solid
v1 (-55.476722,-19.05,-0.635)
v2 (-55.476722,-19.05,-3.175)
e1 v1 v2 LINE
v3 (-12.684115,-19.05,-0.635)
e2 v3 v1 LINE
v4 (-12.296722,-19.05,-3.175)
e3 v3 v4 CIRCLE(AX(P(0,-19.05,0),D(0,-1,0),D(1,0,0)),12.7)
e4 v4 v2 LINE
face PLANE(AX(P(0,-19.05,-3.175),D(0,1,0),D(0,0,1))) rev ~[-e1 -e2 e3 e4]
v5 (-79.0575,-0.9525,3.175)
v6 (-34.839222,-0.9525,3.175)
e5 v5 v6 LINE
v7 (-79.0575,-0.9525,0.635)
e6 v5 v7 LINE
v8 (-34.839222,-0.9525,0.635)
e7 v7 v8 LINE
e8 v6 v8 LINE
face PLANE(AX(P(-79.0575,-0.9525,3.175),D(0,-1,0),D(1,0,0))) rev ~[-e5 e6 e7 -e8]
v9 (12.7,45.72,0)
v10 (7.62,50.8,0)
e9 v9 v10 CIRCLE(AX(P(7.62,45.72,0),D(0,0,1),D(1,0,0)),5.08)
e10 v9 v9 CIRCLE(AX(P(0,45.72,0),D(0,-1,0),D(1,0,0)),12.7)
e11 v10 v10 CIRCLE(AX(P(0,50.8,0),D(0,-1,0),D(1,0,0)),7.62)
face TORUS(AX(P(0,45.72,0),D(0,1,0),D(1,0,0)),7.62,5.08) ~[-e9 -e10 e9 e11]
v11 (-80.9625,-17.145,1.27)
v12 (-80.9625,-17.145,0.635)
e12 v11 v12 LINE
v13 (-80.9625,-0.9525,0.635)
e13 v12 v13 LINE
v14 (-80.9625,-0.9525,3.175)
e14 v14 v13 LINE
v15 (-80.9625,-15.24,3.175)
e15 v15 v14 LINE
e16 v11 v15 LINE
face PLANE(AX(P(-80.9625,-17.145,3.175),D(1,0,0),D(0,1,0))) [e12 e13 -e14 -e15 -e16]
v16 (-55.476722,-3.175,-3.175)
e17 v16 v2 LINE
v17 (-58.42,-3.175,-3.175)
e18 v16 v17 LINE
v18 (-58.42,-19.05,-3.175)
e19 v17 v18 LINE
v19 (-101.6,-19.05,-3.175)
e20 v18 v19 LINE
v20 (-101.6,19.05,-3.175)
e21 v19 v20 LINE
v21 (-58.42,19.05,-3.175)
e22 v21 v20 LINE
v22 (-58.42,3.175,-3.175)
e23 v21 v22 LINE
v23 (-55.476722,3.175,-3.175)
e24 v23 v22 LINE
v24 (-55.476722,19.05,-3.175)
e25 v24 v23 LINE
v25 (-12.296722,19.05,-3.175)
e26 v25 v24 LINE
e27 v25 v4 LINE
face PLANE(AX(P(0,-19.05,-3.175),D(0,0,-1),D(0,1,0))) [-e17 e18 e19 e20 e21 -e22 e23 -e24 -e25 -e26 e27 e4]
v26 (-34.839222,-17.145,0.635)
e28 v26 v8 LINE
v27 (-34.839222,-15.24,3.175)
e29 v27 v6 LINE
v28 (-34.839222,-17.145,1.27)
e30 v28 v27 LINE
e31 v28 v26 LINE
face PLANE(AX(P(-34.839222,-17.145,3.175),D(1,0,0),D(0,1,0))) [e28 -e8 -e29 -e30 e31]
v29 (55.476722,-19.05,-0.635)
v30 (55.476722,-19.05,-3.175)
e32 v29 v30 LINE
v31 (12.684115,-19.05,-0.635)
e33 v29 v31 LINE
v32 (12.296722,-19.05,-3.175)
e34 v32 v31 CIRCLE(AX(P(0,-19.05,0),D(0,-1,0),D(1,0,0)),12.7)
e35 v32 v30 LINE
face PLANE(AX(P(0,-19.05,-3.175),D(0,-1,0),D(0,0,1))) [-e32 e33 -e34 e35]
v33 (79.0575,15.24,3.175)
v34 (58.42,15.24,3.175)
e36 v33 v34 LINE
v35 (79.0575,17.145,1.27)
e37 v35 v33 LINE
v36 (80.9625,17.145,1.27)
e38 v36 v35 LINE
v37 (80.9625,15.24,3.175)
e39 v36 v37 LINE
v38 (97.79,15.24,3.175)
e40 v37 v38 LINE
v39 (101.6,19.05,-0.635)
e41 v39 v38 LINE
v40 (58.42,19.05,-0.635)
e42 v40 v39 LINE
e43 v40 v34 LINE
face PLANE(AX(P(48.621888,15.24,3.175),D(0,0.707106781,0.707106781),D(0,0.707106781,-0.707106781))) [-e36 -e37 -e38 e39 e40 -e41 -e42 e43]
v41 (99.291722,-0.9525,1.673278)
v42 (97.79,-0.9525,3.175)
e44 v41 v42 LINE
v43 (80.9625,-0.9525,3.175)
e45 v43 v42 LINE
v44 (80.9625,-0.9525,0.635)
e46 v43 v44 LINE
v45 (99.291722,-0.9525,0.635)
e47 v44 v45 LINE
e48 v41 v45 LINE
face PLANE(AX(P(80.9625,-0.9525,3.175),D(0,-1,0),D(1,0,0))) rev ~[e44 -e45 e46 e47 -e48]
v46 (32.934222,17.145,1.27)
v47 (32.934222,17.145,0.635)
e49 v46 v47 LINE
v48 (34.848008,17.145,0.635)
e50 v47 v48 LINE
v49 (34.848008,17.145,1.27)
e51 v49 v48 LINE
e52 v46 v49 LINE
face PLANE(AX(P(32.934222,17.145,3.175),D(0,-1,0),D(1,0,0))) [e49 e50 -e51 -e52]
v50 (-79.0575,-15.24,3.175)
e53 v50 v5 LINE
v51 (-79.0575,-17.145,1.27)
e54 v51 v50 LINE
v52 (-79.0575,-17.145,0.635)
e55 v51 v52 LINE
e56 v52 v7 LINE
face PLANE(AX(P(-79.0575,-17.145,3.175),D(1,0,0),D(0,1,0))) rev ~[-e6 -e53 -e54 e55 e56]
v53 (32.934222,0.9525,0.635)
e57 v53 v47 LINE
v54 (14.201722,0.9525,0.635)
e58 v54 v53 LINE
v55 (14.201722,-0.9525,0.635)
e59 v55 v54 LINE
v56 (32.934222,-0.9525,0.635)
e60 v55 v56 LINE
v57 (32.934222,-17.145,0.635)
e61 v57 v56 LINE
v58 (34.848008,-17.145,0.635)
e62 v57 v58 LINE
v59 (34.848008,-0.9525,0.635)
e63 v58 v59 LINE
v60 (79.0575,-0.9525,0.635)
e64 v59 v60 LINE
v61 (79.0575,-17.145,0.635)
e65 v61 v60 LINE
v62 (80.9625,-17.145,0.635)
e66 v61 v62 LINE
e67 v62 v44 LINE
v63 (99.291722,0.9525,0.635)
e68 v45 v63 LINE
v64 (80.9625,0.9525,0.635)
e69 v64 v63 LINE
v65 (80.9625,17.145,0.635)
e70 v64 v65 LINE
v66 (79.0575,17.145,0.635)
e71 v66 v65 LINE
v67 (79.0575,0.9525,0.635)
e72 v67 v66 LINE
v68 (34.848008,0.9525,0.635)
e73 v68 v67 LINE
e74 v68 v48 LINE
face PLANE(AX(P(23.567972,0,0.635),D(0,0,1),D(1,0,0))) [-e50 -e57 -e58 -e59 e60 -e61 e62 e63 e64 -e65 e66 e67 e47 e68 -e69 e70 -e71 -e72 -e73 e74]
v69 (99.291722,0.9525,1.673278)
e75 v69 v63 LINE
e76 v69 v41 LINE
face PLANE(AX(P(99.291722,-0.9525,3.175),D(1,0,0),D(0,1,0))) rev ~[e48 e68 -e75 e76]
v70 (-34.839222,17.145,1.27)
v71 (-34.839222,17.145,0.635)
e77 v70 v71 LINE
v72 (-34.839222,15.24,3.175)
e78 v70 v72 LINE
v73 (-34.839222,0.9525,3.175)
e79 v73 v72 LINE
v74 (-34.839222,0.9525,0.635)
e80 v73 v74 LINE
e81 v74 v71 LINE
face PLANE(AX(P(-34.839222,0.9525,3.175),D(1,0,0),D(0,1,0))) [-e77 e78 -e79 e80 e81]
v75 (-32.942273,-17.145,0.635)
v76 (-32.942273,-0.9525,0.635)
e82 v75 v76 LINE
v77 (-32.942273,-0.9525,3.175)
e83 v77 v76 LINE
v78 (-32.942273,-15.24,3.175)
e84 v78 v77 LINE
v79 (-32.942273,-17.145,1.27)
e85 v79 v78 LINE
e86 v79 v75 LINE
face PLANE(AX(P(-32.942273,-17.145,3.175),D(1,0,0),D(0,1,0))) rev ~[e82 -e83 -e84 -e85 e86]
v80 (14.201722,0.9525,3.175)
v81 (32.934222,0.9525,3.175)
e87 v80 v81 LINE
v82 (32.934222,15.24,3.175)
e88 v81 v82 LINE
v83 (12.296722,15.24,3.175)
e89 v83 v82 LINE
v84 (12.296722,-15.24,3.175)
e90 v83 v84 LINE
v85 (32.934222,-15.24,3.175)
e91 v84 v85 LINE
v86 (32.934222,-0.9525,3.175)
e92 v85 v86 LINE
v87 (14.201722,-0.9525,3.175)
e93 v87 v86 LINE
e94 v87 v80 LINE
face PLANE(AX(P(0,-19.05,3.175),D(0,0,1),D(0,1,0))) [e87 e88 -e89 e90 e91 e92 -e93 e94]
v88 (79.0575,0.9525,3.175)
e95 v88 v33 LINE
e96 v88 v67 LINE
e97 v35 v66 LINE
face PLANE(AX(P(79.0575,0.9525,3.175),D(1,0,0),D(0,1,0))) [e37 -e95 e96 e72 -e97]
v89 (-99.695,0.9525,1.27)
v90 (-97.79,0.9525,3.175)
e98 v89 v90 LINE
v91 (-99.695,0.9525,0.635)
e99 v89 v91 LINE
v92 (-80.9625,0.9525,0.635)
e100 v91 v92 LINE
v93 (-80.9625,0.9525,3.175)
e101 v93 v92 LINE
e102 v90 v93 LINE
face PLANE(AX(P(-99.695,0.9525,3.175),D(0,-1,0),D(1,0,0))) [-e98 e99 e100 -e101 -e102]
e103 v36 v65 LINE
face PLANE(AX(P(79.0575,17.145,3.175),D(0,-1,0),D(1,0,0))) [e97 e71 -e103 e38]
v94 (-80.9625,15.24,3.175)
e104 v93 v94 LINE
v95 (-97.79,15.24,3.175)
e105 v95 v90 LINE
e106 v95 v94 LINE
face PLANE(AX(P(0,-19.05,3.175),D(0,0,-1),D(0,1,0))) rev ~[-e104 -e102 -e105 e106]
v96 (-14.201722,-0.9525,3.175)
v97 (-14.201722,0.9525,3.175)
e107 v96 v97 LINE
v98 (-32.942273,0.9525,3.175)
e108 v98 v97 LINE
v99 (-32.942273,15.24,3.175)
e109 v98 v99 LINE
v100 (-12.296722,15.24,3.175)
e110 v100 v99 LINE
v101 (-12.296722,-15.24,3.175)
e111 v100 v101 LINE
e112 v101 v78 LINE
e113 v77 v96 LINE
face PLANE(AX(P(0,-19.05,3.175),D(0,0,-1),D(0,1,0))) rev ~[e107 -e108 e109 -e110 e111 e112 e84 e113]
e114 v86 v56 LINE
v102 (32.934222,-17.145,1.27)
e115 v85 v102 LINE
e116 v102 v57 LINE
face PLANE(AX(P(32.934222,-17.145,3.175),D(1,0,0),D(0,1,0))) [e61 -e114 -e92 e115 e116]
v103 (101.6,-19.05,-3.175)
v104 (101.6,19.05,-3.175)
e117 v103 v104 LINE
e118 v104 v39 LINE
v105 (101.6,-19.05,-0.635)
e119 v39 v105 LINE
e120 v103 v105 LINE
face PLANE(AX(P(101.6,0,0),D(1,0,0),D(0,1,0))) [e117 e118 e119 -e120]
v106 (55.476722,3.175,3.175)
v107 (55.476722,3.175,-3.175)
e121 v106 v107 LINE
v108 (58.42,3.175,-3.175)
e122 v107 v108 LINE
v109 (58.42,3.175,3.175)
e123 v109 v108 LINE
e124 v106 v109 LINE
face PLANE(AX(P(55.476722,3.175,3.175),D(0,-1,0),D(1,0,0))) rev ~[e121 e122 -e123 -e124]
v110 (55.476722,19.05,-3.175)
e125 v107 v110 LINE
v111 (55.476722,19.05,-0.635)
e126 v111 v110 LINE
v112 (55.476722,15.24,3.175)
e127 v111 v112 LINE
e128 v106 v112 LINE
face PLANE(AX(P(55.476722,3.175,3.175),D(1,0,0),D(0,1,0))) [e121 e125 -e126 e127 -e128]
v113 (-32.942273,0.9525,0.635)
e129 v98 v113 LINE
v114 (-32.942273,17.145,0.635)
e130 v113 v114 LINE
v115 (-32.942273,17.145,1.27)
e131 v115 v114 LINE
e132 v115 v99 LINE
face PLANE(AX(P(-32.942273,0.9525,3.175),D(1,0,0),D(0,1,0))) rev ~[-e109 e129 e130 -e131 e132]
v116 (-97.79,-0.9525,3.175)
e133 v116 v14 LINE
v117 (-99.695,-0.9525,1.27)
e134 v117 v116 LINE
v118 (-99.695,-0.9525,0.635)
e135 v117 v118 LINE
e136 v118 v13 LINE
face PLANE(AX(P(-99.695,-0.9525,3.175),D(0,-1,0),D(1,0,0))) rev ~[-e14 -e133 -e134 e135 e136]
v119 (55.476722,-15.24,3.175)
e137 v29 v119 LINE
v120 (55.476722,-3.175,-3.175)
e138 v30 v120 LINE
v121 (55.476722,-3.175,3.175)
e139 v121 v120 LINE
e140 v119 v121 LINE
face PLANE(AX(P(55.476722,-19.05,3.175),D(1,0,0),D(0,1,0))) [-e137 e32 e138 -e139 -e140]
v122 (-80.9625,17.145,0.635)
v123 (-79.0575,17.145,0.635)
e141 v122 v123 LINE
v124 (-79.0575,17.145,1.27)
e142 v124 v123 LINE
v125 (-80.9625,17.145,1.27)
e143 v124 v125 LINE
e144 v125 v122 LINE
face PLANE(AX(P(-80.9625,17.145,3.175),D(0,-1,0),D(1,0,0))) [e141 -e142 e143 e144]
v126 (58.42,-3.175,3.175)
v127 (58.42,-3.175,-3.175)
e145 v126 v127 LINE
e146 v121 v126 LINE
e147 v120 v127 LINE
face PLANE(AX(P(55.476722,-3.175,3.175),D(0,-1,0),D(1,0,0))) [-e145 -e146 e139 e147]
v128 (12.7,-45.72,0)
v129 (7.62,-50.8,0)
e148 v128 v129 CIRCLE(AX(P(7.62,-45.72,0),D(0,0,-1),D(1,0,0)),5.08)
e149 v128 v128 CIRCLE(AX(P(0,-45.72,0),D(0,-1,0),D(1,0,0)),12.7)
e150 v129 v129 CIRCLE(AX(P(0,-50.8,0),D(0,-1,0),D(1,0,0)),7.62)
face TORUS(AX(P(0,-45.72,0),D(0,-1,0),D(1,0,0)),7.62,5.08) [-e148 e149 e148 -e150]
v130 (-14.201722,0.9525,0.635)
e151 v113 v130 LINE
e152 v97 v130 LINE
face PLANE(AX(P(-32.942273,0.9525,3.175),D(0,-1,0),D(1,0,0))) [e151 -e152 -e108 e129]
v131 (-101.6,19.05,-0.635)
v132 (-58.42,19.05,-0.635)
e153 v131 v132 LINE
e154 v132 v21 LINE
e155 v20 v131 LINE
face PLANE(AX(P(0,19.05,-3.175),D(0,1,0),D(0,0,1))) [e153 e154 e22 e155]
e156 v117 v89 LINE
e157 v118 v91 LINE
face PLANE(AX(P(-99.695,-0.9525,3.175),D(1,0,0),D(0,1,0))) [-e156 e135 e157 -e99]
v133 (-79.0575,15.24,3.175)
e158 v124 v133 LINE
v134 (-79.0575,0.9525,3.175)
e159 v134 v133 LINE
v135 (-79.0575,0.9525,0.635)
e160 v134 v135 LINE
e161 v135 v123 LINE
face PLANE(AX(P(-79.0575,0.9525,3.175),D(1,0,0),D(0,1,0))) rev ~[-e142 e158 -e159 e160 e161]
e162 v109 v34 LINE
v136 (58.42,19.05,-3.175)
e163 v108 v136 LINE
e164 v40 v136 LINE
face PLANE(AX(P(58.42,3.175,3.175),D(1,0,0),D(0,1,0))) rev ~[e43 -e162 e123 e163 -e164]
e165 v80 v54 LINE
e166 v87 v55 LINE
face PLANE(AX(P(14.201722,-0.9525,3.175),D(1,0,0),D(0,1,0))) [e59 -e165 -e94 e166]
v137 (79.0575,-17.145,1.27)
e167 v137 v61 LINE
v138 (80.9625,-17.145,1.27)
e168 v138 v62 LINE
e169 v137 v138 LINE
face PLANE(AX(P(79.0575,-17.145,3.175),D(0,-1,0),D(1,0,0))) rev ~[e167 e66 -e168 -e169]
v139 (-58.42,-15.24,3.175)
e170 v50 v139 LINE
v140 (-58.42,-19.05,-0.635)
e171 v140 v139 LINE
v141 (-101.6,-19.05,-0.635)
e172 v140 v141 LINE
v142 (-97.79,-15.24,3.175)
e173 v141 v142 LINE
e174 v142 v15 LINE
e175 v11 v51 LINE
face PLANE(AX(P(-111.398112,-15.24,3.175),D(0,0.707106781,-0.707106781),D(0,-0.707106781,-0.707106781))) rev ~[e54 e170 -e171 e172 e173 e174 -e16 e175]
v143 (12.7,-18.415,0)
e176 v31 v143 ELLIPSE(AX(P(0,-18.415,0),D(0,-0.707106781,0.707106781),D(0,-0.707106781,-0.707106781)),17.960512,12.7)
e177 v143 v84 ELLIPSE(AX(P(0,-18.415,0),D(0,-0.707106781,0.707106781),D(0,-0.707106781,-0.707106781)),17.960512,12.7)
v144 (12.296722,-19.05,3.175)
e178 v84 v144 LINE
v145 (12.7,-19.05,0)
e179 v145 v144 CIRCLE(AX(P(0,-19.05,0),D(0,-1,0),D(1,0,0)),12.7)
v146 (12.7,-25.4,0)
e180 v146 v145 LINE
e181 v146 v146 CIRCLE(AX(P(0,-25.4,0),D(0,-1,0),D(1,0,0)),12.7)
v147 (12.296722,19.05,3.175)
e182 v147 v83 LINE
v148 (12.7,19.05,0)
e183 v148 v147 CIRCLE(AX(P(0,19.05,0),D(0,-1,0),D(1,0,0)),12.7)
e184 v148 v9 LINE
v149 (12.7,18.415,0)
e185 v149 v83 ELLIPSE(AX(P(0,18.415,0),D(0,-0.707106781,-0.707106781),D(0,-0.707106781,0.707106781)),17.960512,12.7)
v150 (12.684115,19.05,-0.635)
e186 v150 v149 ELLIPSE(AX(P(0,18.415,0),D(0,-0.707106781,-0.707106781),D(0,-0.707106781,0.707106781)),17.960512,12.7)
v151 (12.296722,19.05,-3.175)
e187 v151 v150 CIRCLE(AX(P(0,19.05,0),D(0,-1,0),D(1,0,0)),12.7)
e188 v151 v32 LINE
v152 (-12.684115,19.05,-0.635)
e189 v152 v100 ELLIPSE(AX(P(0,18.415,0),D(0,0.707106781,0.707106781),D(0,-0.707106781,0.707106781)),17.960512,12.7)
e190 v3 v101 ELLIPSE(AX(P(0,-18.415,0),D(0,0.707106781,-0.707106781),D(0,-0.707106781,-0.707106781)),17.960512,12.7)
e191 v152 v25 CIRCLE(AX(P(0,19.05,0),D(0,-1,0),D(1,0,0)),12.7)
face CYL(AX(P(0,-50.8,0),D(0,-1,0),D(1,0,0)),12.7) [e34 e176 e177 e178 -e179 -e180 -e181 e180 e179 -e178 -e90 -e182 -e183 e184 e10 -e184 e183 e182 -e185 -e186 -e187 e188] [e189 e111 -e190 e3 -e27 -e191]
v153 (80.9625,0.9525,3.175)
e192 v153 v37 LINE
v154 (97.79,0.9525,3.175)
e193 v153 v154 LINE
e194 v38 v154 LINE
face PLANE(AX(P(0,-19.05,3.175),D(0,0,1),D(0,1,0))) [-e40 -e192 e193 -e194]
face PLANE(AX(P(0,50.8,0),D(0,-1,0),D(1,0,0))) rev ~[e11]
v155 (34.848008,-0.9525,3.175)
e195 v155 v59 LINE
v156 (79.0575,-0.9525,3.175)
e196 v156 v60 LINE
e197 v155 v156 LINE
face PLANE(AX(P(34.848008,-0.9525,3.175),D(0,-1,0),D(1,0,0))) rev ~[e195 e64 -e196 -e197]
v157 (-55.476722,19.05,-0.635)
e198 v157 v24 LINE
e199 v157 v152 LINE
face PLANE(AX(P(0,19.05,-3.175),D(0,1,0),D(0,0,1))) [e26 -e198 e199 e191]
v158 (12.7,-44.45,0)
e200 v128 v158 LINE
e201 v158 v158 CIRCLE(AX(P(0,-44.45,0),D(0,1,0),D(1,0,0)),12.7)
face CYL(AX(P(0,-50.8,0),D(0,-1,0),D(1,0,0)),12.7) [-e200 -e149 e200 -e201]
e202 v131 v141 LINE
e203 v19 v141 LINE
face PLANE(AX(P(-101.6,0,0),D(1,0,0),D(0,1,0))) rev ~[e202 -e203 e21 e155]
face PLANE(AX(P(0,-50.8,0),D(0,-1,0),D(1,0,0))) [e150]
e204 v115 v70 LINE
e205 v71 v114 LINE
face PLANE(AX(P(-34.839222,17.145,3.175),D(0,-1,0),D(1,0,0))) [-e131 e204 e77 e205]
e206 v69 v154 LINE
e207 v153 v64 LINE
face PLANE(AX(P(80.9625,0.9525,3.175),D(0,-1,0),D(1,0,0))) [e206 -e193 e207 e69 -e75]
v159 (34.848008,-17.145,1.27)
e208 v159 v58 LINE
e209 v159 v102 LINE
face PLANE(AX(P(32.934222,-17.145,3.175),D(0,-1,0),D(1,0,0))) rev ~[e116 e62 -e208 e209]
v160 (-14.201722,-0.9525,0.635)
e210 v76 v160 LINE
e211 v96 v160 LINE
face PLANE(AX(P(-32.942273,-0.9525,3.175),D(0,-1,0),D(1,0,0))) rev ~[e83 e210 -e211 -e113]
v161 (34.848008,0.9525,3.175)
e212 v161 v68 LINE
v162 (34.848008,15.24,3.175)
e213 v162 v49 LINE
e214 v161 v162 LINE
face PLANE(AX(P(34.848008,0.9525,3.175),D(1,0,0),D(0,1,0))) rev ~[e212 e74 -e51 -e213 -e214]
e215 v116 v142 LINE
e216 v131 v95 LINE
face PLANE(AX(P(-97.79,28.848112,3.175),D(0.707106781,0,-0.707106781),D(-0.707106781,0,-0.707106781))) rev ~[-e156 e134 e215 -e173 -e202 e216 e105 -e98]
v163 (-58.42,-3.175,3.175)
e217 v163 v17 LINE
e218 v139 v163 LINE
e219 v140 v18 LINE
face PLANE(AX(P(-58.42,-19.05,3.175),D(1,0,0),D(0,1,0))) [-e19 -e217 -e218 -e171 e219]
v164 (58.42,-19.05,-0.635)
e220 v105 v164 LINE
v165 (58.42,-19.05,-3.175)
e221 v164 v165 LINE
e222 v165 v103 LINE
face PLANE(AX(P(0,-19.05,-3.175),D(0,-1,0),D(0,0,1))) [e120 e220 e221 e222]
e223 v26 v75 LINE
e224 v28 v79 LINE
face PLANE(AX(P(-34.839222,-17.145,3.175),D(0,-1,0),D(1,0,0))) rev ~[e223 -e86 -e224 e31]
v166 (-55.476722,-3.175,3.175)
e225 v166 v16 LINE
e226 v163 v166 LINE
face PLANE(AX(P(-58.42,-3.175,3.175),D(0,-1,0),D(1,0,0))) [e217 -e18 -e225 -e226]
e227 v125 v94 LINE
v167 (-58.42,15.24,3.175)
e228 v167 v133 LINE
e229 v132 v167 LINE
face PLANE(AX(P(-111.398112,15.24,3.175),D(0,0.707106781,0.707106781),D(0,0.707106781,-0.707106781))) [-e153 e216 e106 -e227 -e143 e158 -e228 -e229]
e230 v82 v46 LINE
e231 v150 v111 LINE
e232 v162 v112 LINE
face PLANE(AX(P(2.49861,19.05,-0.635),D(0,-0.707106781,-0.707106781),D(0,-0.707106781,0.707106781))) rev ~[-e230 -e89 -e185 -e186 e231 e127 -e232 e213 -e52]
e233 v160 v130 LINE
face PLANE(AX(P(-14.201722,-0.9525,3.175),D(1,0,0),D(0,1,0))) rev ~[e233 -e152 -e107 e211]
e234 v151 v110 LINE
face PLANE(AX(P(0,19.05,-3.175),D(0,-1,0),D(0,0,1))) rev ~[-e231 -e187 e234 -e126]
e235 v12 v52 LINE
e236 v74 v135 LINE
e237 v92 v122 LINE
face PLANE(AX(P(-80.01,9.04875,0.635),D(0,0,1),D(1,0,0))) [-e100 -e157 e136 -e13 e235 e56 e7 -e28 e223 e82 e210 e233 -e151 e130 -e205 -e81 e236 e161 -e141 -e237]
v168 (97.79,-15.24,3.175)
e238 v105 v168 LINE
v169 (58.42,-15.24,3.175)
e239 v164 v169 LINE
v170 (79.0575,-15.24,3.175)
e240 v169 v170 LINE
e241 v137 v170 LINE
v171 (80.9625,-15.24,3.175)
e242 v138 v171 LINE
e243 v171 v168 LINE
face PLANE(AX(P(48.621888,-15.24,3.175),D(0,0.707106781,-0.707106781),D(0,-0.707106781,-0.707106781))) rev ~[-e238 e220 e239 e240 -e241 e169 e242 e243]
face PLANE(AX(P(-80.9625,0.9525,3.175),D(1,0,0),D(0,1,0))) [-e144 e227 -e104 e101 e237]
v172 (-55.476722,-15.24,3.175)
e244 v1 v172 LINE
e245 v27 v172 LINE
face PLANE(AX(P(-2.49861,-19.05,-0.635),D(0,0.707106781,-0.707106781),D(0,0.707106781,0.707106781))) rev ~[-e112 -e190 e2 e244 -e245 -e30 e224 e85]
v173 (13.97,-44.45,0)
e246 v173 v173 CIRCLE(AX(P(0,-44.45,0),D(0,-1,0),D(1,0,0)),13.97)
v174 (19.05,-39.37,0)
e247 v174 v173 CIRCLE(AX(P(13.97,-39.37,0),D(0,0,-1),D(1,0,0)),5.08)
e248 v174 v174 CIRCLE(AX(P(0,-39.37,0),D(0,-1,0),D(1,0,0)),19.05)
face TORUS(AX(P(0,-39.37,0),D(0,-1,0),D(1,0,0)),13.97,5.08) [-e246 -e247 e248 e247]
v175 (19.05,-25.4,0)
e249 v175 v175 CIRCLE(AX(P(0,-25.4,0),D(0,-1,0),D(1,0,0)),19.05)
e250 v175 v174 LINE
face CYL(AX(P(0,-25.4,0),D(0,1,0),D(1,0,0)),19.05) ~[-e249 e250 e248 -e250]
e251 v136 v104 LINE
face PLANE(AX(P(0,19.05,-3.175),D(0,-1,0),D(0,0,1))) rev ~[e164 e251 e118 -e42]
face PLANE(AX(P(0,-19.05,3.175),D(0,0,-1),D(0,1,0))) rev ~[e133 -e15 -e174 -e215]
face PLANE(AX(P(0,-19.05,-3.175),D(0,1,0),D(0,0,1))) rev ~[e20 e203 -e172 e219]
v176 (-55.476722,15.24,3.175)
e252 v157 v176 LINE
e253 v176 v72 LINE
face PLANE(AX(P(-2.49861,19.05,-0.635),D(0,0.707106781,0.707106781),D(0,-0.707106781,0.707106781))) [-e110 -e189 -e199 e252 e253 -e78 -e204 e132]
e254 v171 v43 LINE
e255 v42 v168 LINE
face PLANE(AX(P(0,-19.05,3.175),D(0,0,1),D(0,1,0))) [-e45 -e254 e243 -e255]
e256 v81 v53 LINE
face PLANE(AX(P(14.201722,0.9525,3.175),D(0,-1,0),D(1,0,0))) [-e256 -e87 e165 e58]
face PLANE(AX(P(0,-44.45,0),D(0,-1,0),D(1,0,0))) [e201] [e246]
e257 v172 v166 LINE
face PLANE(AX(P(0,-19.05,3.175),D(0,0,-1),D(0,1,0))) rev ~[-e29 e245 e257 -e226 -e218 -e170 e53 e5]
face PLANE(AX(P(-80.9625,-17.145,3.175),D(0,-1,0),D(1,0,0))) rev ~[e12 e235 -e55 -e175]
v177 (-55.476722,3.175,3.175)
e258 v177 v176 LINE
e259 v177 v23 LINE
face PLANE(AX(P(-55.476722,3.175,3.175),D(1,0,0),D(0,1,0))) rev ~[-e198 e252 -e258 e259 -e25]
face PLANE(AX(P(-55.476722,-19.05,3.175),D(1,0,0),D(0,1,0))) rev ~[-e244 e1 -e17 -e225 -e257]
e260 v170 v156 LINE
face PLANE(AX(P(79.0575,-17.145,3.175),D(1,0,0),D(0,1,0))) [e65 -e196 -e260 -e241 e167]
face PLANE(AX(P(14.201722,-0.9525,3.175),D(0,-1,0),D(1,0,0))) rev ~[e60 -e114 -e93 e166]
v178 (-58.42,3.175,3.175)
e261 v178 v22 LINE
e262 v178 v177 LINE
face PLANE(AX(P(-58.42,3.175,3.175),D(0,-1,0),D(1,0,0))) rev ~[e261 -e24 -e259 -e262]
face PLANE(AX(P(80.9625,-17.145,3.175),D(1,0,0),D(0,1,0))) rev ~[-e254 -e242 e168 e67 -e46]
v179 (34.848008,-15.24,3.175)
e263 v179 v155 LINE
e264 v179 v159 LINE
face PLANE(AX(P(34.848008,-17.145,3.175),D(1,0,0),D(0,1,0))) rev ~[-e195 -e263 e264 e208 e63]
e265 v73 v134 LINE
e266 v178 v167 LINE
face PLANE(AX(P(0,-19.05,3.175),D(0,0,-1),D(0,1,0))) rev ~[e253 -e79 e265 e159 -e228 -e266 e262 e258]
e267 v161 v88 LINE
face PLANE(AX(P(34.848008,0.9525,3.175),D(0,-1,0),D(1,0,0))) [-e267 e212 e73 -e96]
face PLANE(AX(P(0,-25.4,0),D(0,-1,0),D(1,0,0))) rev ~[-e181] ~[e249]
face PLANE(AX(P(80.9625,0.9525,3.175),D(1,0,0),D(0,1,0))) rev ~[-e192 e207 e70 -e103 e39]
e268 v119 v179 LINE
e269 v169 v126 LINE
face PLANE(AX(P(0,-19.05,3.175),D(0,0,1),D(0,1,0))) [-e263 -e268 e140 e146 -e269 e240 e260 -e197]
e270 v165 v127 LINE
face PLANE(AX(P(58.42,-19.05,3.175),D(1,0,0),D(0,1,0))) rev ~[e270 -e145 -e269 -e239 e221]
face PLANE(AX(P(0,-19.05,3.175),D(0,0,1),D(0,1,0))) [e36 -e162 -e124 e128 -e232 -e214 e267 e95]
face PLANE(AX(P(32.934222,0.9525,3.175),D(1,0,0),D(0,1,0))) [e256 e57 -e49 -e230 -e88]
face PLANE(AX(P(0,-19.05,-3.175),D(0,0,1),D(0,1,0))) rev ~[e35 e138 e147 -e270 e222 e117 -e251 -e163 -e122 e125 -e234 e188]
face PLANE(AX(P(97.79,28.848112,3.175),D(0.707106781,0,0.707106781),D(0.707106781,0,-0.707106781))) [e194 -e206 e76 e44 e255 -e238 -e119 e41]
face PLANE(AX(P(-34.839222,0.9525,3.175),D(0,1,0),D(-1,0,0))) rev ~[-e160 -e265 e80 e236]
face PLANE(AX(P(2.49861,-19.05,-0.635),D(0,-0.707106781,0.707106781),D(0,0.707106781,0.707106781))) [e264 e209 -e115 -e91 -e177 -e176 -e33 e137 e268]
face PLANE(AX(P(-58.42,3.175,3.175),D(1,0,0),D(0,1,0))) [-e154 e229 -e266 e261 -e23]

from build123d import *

# Parameters (mm, degrees)
F1_R          = 12.7
F2_DEPTH      = 101.6
F3_R          = 5.08
F4_W          = 38.1
F4_H          = 6.35
F5_DEPTH      = 101.6
F6_DEPTH      = 101.6
F7_W          = 2.9432778758
F7_H          = 15.875
F8_DEPTH      = 25.4
F9_W          = 2.9432778758
F9_H          = 15.875
F10_DEPTH     = 25.4
F11_W         = 1.905
F11_H         = 16.1925
F11_W_2       = 18.7325
F11_H_2       = 1.905
F11_W_3       = 44.2182778758
F11_W_4       = 1.8969494015
F11_W_5       = 18.7405505985
F12_DEPTH     = 2.54
F13_W         = 18.7325
F13_H         = 1.905
F13_W_2       = 1.9137861806
F13_H_2       = 16.1925
F13_W_3       = 44.2094916952
F13_W_4       = 1.905
F13_W_5       = 18.3292221242
F14_DEPTH     = 2.54
F15_T1_DEPTH  = 57.6962243683
F15_T3_DEPTH  = 62.7762243683
F15_T5_DEPTH  = 62.7762243683
F15_T10_DEPTH = 62.7762243683
F15_S11_R     = 12.7
F15_T12_DEPTH = 33
F15_T16_DEPTH = 62.7762243683
F15_S17_R     = 12.7
F15_T18_DEPTH = 33
F15_T22_DEPTH = 62.7762243683
F15_S23_R     = 12.7
F15_T24_DEPTH = 33
F15_T28_DEPTH = 62.7762243683
F15_S29_R     = 12.7
F15_T30_DEPTH = 33
F17_R         = 19.05
F18_DEPTH     = 19.05
F19_R         = 5.08


# Not quite as in the source:
# - a fillet or chamfer that OpenCascade refuses, or shapes differently, is made with other operations: its cross-section is extruded or revolved along the edge and cut away or added


with BuildPart() as f2:
    # F1 (on offset) → F2 (new body)
    with BuildSketch(Plane.XZ.offset(50.8)):
        Circle(F1_R)
    extrude(amount=-F2_DEPTH)

    # F3
    f3_edges = [f2.edges().sort_by_distance(p)[0] for p in [
        (-12.7, -50.8, 0),
        (-12.7, 50.8, 0),
    ]]
    fillet(f3_edges, radius=F3_R)

    # F4 (on Right) → F5 (join)
    with BuildSketch(Plane.YZ):
        Rectangle(F4_W, F4_H)
    extrude(amount=F5_DEPTH)

    # F4 (on Right) → F6 (join)
    with BuildSketch(Plane.YZ):
        Rectangle(F4_W, F4_H)
    extrude(amount=-F6_DEPTH)

    # F7 (on face) → F8 (cut)
    with BuildSketch(Plane.XY.offset(3.175)):
        with Locations((-56.9483610621, 11.1125)):
            Rectangle(F7_W, F7_H)
        with Locations((-56.9483610621, -11.1125)):
            Rectangle(F7_W, F7_H)
    extrude(amount=-F8_DEPTH, mode=Mode.SUBTRACT)

    # F9 (on face) → F10 (cut)
    with BuildSketch(Plane.XY.offset(3.175)):
        with Locations((56.9483610621, 11.1125)):
            Rectangle(F9_W, F9_H)
        with Locations((56.9483610621, -11.1125)):
            Rectangle(F9_W, F9_H)
    extrude(amount=-F10_DEPTH, mode=Mode.SUBTRACT)

    # F11 (on face) → F12 (cut)
    with BuildSketch(Plane.XY.offset(3.175)):
        with Locations((-80.01, 9.04875)):
            Rectangle(F11_W, F11_H)
        with Locations((-90.32875, 0)):
            Rectangle(F11_W_2, F11_H_2)
        with Locations((-80.01, 0)):
            Rectangle(F11_W, F11_H_2)
        with Locations((-80.01, -9.04875)):
            Rectangle(F11_W, F11_H)
        with Locations((-56.9483610621, 0)):
            Rectangle(F11_W_3, F11_H_2)
        with Locations((-33.8907474235, -9.04875)):
            Rectangle(F11_W_4, F11_H)
        with Locations((-33.8907474235, 0)):
            Rectangle(F11_W_4, F11_H_2)
        with Locations((-33.8907474235, 9.04875)):
            Rectangle(F11_W_4, F11_H)
        with Locations((-23.5719974235, 0)):
            Rectangle(F11_W_5, F11_H_2)
    extrude(amount=-F12_DEPTH, mode=Mode.SUBTRACT)

    # F13 (on face) → F14 (cut)
    with BuildSketch(Plane.XY.offset(3.175)):
        with Locations((23.5679721242, 0)):
            Rectangle(F13_W, F13_H)
        with Locations((33.8911152145, 9.04875)):
            Rectangle(F13_W_2, F13_H_2)
        with Locations((33.8911152145, 0)):
            Rectangle(F13_W_2, F13_H)
        with Locations((33.8911152145, -9.04875)):
            Rectangle(F13_W_2, F13_H_2)
        with Locations((56.9527541524, 0)):
            Rectangle(F13_W_3, F13_H)
        with Locations((80.01, 9.04875)):
            Rectangle(F13_W_4, F13_H_2)
        with Locations((80.01, 0)):
            Rectangle(F13_W_4, F13_H)
        with Locations((90.1271110621, 0)):
            Rectangle(F13_W_5, F13_H)
        with Locations((80.01, -9.04875)):
            Rectangle(F13_W_4, F13_H_2)
    extrude(amount=-F14_DEPTH, mode=Mode.SUBTRACT)

    # F15: chamfer of 3.81 on 10 edges, made by hand

    # F15_s2 → F15_t1 (cut)
    with BuildSketch(Plane.XZ.offset(-28.8481121842)):
        Polygon((-97.79, 3.175), (-101.6, -0.635), (-101.6, 3.175), align=None)
        Polygon((97.79, 3.175), (101.6, -0.635), (101.6, 3.175), align=None)
    extrude(amount=F15_T1_DEPTH, mode=Mode.SUBTRACT)

    # F15_s4 → F15_t3 (cut)
    with BuildSketch(Plane.YZ.offset(48.6218878158)):
        Polygon((15.24, 3.175), (19.05, -0.635), (19.05, 3.175), align=None)
        Polygon((-15.24, 3.175), (-19.05, -0.635), (-19.05, 3.175), align=None)
    extrude(amount=F15_T3_DEPTH, mode=Mode.SUBTRACT)

    # F15_s6 → F15_t5 (cut)
    with BuildSketch(Plane.YZ.offset(-111.3981121842)):
        Polygon((-15.24, 3.175), (-19.05, -0.635), (-19.05, 3.175), align=None)
        Polygon((15.24, 3.175), (19.05, -0.635), (19.05, 3.175), align=None)
    extrude(amount=F15_T5_DEPTH, mode=Mode.SUBTRACT)


with BuildPart() as f15_tool8:
    # F15_s9 → F15_t10 (new body)
    with BuildSketch(Plane.YZ.offset(2.4986099401)):
        Polygon((19.05, -0.635), (15.24, 3.175), (19.05, 3.175), align=None)
    extrude(amount=F15_T10_DEPTH)

    # F15_s11 → F15_t12 (cut, symmetric)
    with BuildSketch(Plane.XZ.offset(-17.1)):
        Circle(F15_S11_R)
    extrude(amount=F15_T12_DEPTH, both=True, mode=Mode.SUBTRACT)


with BuildPart() as f2_1:
    add(f2.part)

    # F15_t7: cut F15_tool8
    add(f15_tool8.part, mode=Mode.SUBTRACT)


with BuildPart() as f15_tool14:
    # F15_s15 → F15_t16 (new body)
    with BuildSketch(Plane.YZ.offset(2.4986099401)):
        Polygon((-19.05, -0.635), (-15.24, 3.175), (-19.05, 3.175), align=None)
    extrude(amount=F15_T16_DEPTH)

    # F15_s17 → F15_t18 (cut, symmetric)
    with BuildSketch(Plane.XZ.offset(17.1)):
        Circle(F15_S17_R)
    extrude(amount=F15_T18_DEPTH, both=True, mode=Mode.SUBTRACT)


with BuildPart() as f2_2:
    add(f2_1.part)

    # F15_t13: cut F15_tool14
    add(f15_tool14.part, mode=Mode.SUBTRACT)


with BuildPart() as f15_tool20:
    # F15_s21 → F15_t22 (new body)
    with BuildSketch(Plane.YZ.offset(-2.4986099401)):
        Polygon((-19.05, -0.635), (-15.24, 3.175), (-19.05, 3.175), align=None)
    extrude(amount=-F15_T22_DEPTH)

    # F15_s23 → F15_t24 (cut, symmetric)
    with BuildSketch(Plane.XZ.offset(17.1)):
        Circle(F15_S23_R)
    extrude(amount=F15_T24_DEPTH, both=True, mode=Mode.SUBTRACT)


with BuildPart() as f2_3:
    add(f2_2.part)

    # F15_t19: cut F15_tool20
    add(f15_tool20.part, mode=Mode.SUBTRACT)


with BuildPart() as f15_tool26:
    # F15_s27 → F15_t28 (new body)
    with BuildSketch(Plane.YZ.offset(-2.4986099401)):
        Polygon((19.05, -0.635), (15.24, 3.175), (19.05, 3.175), align=None)
    extrude(amount=-F15_T28_DEPTH)

    # F15_s29 → F15_t30 (cut, symmetric)
    with BuildSketch(Plane.XZ.offset(-17.1)):
        Circle(F15_S29_R)
    extrude(amount=F15_T30_DEPTH, both=True, mode=Mode.SUBTRACT)


with BuildPart() as f2_4:
    add(f2_3.part)

    # F15_t25: cut F15_tool26
    add(f15_tool26.part, mode=Mode.SUBTRACT)

    # F17 (on offset) → F18 (join)
    with BuildSketch(Plane.XZ.offset(25.4)):
        Circle(F17_R)
    extrude(amount=F18_DEPTH)

    # F19
    f19_edges = [f2_4.edges().sort_by_distance(p)[0] for p in [
        (-19.05, -44.45, 0),
        (-7.62, -50.8, 0),
    ]]
    fillet(f19_edges, radius=F19_R)


solid = f2_4.part
